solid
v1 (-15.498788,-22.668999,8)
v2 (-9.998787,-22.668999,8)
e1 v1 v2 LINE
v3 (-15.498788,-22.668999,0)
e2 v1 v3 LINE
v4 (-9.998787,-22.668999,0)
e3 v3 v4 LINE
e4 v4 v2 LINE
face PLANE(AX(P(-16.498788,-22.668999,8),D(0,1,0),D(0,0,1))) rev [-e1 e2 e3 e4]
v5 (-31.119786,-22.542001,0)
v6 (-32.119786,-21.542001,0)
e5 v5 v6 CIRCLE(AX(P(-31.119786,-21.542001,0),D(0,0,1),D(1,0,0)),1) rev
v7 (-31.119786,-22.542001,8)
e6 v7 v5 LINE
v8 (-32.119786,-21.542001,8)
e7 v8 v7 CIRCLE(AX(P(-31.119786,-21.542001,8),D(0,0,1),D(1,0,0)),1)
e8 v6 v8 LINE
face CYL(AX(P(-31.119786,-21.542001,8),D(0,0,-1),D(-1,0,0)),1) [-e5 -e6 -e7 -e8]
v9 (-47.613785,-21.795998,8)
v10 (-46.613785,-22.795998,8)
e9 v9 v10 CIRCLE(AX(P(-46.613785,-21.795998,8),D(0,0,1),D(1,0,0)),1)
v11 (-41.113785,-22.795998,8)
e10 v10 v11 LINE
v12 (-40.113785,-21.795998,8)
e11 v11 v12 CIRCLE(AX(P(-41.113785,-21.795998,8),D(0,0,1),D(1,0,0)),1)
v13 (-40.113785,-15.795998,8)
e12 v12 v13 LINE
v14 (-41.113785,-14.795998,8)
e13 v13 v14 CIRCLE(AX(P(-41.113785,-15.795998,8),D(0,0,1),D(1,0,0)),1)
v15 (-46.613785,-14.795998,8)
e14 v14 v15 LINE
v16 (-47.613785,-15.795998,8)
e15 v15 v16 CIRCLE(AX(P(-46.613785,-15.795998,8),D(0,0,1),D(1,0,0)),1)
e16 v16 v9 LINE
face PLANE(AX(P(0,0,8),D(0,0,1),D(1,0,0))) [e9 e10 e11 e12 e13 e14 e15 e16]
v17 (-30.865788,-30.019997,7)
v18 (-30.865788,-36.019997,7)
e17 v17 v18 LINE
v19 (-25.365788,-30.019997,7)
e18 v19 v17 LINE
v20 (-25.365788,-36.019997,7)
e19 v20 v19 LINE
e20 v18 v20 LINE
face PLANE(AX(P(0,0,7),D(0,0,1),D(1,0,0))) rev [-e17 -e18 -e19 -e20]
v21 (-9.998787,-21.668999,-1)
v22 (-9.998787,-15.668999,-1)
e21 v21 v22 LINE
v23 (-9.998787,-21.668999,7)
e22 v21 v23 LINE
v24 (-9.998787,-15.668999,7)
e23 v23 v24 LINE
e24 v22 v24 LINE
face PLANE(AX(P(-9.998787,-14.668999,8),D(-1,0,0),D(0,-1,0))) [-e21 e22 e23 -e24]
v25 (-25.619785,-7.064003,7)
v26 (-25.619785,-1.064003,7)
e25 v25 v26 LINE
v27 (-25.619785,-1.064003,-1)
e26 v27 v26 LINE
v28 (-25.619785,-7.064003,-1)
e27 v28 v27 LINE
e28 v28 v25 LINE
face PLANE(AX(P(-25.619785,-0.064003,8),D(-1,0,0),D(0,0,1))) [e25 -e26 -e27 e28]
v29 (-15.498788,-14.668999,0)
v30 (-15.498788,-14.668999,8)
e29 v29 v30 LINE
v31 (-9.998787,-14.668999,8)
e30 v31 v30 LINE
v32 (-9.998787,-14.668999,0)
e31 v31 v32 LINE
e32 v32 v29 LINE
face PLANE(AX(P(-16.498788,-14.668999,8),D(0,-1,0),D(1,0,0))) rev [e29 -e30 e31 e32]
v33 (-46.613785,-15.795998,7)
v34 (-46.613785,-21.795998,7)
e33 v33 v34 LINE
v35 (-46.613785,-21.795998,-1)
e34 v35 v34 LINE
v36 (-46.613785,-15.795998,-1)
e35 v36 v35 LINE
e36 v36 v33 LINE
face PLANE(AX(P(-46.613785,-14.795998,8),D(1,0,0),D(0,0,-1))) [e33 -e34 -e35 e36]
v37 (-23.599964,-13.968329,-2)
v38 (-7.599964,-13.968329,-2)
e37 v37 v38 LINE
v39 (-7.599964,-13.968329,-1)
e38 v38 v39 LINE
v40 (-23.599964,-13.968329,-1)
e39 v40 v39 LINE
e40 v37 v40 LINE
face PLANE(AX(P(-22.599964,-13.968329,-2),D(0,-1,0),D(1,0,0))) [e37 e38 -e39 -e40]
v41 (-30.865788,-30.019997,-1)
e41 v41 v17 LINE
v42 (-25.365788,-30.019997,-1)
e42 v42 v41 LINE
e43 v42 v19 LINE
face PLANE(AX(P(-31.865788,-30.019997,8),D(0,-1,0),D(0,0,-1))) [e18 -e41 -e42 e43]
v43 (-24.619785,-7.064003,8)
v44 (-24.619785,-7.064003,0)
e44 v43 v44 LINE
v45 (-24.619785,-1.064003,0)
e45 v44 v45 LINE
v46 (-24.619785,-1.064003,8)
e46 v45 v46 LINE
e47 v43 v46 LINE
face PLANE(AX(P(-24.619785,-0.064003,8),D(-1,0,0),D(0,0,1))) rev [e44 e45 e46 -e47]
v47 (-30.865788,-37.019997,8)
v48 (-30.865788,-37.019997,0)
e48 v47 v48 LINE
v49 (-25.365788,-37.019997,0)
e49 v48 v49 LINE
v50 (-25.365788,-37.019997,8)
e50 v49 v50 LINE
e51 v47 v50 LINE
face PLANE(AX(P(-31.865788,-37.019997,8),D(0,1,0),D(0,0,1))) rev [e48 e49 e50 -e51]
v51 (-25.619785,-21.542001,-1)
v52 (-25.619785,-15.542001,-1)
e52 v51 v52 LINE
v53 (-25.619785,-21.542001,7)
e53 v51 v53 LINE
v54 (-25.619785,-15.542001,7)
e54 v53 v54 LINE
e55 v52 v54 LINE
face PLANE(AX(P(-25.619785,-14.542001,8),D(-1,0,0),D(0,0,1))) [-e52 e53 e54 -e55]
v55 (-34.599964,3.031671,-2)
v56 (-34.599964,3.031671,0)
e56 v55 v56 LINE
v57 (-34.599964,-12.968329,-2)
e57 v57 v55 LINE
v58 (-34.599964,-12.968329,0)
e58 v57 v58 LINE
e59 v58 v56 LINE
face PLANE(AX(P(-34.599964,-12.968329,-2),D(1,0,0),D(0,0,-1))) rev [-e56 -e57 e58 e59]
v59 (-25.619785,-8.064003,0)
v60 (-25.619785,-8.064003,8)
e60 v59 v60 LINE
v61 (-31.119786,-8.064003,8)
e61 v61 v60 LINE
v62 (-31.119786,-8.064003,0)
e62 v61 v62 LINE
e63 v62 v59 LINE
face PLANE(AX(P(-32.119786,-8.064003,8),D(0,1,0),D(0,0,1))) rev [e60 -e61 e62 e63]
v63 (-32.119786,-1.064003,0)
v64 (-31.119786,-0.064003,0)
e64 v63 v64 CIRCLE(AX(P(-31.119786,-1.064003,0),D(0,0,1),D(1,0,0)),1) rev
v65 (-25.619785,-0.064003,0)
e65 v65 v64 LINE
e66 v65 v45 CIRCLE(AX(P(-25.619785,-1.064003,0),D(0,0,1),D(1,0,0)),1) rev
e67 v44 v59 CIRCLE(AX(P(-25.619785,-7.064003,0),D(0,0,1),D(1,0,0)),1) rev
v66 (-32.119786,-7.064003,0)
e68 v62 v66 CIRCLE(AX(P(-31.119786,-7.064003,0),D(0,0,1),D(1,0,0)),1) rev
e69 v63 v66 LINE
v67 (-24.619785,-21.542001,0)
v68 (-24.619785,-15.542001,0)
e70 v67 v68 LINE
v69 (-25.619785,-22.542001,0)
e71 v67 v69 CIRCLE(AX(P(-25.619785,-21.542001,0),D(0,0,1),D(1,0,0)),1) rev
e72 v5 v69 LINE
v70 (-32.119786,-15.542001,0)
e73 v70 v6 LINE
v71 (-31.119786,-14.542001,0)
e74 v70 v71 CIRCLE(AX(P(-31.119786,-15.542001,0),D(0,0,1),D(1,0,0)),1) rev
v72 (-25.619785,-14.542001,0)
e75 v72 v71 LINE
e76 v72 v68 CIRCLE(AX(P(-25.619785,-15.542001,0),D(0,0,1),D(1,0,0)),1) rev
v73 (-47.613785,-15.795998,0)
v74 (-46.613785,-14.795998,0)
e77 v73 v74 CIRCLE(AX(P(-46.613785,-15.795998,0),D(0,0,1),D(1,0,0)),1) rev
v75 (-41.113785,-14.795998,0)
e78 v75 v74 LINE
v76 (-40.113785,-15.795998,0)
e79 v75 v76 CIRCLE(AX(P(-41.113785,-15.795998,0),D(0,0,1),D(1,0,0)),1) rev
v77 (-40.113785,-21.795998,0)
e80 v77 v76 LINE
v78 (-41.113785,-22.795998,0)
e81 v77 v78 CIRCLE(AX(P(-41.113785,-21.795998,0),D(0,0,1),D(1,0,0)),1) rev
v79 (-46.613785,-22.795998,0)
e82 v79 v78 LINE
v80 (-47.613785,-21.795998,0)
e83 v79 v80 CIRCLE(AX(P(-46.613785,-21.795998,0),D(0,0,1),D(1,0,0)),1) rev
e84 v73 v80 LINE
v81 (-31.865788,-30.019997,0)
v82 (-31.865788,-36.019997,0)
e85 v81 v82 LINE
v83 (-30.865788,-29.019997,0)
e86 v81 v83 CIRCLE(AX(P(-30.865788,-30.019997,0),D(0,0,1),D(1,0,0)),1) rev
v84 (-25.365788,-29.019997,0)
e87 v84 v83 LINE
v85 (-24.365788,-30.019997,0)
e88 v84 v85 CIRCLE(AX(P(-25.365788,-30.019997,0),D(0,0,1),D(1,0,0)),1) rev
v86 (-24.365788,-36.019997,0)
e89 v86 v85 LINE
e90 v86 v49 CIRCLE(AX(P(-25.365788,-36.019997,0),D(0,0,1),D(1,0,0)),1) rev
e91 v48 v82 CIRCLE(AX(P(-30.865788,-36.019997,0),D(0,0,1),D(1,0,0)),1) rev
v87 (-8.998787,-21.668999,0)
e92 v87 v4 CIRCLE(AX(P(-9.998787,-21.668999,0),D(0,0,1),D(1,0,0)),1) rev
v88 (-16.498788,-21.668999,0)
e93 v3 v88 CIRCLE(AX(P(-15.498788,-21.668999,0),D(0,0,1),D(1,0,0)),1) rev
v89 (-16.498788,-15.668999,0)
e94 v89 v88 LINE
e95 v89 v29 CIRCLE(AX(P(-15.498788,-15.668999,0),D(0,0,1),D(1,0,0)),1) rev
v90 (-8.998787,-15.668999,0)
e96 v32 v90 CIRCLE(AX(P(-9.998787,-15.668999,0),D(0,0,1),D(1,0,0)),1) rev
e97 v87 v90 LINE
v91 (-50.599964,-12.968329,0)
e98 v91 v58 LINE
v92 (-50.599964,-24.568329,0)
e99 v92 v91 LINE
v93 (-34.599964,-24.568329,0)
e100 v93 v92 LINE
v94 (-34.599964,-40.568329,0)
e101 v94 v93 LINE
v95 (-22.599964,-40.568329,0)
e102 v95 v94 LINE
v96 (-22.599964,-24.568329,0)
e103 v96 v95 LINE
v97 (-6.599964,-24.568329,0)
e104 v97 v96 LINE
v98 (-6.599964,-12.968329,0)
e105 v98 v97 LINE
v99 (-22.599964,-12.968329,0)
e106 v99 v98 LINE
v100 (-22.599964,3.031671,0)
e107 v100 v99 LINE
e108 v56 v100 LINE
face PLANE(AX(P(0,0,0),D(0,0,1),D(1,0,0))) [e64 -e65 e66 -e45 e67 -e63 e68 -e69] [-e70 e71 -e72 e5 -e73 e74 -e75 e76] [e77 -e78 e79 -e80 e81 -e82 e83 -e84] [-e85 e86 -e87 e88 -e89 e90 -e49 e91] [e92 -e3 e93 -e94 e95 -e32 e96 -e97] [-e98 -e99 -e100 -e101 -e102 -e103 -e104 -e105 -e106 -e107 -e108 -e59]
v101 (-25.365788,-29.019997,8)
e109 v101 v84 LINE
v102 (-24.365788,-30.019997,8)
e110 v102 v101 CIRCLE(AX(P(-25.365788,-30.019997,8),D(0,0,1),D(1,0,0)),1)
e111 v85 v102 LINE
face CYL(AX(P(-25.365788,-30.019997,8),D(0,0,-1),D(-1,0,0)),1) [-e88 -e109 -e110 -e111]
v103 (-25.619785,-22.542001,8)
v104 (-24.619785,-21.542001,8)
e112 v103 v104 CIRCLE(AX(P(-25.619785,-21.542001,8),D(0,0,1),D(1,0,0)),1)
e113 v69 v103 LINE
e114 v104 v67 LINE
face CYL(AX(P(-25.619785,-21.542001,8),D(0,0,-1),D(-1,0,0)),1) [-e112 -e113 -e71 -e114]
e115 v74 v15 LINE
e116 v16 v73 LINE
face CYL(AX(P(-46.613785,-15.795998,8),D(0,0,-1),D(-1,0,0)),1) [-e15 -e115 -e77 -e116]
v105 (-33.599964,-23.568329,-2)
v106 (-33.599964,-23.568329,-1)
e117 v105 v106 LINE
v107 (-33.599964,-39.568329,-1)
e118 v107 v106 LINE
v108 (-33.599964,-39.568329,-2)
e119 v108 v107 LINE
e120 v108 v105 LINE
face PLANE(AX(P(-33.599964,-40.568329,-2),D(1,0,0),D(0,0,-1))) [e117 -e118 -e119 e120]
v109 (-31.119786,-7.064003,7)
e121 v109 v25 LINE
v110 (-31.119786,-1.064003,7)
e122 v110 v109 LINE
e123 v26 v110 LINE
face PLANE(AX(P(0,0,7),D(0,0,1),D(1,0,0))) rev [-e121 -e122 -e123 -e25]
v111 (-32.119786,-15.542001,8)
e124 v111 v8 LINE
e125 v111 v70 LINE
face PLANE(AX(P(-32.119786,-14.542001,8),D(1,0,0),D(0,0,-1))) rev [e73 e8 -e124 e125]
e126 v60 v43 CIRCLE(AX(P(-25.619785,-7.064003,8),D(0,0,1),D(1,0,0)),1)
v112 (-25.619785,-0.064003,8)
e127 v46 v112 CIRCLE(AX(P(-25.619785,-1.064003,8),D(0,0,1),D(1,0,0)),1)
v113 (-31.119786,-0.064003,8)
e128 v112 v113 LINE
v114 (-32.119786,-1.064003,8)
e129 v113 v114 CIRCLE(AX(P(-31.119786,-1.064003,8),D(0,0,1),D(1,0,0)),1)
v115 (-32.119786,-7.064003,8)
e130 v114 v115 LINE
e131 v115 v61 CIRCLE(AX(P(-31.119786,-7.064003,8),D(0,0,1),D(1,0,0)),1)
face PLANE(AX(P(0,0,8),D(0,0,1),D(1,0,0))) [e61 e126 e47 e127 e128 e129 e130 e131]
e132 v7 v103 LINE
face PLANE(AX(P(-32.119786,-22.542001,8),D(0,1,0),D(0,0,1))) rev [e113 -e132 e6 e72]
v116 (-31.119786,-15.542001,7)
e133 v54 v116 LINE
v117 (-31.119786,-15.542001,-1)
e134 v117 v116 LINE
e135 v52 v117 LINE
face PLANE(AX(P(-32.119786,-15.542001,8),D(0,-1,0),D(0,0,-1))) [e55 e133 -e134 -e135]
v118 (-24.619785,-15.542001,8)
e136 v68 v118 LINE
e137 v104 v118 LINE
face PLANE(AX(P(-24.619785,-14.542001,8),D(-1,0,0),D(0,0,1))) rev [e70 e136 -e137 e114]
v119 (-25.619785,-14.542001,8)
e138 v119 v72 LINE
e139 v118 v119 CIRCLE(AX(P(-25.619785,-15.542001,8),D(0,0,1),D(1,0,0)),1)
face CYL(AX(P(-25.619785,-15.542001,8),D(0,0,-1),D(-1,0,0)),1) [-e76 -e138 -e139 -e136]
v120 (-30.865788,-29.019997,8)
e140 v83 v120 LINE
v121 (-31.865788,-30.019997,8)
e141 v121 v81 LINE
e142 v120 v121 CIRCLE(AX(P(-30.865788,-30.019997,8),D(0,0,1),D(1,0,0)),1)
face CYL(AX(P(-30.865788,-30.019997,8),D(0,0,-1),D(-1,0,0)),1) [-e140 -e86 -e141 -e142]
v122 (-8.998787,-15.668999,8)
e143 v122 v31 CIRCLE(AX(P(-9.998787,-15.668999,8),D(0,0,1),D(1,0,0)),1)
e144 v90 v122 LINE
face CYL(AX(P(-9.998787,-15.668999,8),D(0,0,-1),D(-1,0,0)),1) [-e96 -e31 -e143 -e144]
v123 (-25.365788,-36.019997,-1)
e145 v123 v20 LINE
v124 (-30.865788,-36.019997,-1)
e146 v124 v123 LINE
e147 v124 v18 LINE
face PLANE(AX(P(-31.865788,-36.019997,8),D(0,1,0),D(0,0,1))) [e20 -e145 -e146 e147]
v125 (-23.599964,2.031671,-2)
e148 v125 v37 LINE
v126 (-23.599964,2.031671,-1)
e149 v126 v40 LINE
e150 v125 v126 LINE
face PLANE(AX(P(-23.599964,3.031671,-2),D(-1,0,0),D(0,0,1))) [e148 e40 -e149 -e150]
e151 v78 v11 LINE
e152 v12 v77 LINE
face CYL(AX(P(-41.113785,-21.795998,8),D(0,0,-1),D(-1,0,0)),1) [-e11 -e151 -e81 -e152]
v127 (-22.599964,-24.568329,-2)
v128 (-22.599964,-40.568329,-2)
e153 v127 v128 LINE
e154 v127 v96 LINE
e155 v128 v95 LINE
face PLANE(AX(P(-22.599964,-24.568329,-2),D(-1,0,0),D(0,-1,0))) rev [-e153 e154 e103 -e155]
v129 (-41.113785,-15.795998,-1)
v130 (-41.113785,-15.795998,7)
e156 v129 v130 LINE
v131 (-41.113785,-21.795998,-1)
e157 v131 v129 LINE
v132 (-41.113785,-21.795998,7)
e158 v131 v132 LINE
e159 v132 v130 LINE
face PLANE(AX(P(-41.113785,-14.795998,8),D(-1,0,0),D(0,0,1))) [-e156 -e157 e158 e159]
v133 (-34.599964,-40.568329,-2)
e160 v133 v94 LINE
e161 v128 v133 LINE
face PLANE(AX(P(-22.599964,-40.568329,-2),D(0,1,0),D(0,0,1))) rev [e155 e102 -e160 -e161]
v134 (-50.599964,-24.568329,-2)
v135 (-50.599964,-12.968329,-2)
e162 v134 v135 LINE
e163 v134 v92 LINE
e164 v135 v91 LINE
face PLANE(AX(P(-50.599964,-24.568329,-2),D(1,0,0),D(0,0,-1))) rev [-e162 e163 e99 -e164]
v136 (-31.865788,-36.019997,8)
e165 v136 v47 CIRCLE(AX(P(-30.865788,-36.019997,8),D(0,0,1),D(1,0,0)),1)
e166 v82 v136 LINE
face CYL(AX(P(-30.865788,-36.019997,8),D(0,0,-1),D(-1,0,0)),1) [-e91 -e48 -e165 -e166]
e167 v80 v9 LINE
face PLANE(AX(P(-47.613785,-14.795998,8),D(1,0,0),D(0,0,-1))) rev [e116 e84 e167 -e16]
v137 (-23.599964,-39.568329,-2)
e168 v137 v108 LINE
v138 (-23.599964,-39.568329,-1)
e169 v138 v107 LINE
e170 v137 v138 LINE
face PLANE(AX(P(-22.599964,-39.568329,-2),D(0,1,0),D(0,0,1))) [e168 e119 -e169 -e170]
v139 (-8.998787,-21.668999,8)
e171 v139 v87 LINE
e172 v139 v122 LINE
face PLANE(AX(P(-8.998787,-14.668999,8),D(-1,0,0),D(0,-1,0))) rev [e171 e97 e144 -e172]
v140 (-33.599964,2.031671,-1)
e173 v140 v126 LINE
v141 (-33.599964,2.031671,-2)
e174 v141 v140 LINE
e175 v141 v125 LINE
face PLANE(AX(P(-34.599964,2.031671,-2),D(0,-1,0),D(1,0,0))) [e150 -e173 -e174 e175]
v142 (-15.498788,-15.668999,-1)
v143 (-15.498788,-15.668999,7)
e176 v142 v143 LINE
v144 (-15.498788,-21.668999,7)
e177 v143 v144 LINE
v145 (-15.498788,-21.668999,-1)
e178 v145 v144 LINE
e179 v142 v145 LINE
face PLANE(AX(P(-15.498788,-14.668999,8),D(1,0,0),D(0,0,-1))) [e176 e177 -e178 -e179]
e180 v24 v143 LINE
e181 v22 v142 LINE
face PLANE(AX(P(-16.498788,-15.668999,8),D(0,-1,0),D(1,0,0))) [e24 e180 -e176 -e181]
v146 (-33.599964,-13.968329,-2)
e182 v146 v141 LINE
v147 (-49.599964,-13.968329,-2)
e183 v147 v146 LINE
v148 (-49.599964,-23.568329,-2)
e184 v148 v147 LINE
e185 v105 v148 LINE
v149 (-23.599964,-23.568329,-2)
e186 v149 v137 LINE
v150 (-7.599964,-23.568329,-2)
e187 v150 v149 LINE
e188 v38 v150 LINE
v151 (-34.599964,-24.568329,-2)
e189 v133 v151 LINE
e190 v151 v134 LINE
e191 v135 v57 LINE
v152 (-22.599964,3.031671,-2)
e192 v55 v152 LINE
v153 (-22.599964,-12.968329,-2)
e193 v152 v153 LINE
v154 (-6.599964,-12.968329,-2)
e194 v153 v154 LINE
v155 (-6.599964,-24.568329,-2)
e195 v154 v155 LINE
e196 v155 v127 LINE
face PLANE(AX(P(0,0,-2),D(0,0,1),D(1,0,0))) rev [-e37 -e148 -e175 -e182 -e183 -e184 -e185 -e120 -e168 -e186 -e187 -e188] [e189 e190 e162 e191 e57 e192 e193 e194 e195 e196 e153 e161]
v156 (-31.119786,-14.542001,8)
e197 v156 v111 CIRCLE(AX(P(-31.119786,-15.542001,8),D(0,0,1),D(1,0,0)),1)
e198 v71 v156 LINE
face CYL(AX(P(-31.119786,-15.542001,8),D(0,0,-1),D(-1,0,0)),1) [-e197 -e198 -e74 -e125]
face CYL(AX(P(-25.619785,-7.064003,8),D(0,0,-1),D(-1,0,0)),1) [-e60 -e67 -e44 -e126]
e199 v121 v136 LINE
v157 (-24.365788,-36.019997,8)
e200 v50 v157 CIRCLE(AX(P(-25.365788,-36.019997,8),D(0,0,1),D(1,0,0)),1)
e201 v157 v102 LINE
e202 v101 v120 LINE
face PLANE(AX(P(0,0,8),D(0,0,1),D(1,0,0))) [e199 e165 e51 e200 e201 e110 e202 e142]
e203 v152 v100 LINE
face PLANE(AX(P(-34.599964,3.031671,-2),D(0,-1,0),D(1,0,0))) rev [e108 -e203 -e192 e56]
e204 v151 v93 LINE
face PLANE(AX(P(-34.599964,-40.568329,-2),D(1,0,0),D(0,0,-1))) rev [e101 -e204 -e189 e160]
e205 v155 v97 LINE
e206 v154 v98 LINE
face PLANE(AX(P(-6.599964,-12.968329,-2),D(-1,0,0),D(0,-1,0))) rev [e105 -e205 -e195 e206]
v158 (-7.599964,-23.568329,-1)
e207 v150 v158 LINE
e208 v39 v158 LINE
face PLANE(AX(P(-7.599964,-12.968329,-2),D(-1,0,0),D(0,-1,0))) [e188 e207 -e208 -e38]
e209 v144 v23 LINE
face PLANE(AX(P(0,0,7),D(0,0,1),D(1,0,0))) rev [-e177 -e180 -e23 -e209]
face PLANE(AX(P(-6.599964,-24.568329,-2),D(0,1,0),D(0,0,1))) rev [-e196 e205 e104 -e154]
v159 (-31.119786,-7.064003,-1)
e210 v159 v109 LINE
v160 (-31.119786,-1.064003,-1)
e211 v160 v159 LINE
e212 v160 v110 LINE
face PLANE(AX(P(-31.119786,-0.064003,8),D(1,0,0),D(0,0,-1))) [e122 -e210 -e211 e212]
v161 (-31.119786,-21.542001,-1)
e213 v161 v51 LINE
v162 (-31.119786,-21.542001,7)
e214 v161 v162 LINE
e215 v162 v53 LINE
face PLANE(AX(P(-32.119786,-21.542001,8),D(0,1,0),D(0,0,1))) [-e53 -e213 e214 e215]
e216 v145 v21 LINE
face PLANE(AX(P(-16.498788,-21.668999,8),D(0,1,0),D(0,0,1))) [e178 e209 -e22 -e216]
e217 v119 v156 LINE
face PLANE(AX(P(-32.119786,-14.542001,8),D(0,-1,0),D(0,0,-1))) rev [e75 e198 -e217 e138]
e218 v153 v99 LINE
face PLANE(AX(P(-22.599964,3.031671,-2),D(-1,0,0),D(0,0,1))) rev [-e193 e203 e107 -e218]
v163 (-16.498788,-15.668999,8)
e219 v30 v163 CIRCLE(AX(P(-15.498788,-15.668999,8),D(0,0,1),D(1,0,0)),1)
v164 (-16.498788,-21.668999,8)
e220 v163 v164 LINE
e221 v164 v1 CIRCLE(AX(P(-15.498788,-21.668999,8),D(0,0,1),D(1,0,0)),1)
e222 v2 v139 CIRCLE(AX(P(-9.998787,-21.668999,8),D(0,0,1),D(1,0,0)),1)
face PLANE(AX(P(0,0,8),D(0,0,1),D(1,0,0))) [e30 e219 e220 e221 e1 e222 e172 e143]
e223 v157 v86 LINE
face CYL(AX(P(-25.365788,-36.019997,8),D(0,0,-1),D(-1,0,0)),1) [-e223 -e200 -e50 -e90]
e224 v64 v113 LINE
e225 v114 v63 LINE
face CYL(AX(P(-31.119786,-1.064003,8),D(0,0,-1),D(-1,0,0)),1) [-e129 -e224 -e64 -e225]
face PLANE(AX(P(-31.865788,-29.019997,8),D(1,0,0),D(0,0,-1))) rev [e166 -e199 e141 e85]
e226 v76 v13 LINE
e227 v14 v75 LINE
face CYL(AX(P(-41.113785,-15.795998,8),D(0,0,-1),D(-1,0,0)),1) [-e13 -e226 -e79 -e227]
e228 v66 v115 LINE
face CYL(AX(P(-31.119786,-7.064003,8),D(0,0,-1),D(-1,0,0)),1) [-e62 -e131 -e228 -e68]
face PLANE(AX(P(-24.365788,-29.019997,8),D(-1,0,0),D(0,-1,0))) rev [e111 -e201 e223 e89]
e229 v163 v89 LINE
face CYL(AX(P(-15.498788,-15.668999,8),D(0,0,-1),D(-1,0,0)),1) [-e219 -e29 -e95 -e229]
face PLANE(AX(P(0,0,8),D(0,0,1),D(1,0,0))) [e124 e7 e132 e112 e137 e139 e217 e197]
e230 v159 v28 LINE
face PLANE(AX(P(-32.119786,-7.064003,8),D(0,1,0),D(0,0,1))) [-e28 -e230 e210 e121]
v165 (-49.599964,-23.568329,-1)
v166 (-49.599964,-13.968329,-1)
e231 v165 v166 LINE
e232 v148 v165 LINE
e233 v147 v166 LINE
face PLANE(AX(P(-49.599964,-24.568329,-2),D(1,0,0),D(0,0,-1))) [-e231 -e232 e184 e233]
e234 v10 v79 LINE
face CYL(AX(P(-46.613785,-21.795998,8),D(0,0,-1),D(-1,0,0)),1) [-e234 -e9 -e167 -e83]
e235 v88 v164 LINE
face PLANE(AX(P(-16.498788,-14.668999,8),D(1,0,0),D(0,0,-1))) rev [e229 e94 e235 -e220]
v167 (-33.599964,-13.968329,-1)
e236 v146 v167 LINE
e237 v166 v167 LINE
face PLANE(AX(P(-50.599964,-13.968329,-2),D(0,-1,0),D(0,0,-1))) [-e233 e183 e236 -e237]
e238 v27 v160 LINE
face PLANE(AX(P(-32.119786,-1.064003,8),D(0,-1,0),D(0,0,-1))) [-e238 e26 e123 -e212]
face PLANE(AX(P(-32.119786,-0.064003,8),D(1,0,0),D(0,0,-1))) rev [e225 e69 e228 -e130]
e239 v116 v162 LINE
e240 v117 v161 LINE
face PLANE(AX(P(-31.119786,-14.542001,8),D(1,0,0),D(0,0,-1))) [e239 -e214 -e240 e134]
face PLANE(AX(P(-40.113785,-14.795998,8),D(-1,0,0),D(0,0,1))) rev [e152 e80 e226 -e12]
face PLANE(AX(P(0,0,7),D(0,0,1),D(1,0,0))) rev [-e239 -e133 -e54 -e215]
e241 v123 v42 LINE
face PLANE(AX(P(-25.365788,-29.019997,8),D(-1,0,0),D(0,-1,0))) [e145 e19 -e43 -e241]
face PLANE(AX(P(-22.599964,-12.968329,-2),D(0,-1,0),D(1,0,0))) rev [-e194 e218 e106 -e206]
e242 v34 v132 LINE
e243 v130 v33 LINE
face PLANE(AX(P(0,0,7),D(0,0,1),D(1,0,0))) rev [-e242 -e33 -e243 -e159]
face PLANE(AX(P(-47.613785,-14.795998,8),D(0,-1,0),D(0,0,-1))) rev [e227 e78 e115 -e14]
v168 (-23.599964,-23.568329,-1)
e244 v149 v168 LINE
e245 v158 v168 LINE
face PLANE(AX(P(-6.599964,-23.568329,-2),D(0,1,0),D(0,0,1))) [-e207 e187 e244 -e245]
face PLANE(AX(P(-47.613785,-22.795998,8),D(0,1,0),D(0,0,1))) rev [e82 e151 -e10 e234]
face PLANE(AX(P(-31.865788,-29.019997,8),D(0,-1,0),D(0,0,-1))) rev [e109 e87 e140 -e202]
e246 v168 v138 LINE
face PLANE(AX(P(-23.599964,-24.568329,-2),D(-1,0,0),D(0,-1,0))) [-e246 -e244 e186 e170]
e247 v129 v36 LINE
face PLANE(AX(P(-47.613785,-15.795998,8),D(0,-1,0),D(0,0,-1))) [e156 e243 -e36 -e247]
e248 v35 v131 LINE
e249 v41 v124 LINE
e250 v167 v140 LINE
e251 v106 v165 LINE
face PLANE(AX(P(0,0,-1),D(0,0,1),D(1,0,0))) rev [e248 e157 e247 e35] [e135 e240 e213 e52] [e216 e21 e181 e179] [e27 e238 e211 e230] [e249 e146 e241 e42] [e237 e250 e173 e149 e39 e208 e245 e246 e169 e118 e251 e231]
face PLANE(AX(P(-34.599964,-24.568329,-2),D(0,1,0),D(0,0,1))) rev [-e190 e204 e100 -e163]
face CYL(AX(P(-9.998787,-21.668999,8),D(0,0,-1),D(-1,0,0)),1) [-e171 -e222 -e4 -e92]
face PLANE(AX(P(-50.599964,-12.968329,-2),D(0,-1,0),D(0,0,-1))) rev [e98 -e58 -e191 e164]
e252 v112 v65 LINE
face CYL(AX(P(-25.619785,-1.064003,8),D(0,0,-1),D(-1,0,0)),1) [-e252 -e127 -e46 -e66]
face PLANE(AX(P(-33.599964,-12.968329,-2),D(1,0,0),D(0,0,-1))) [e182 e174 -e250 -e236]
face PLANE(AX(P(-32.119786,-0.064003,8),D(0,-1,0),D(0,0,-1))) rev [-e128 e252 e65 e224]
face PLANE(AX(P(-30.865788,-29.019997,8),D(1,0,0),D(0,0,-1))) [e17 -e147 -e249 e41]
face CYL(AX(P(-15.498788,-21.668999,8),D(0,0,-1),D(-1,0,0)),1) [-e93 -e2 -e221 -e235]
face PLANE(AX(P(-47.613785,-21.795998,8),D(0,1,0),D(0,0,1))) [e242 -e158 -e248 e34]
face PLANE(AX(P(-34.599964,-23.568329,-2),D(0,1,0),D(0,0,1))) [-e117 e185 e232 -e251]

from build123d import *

# Parameters (mm, degrees)
SKETCH1_W             = 7.5000007
SKETCH1_H             = 8
BOSS_EXTRUDE1_DEPTH   = 8
BOSS_EXTRUDE1_2_DEPTH = 8
SKETCH1_W_2           = 7.500000349
SKETCH1_H_2           = 7.999999673
BOSS_EXTRUDE1_3_DEPTH = 8
SKETCH1_W_3           = 7.500000699
SKETCH1_H_3           = 7.999999344
BOSS_EXTRUDE1_4_DEPTH = 8
SKETCH1_W_4           = 7.50000035
SKETCH1_H_4           = 7.999999672
BOSS_EXTRUDE1_5_DEPTH = 8
BOSS_EXTRUDE2_DEPTH   = 2
FILLET1_R             = 1
FILLET2_R             = 1
FILLET3_R             = 1
FILLET4_R             = 1
FILLET5_R             = 1
SHELL8_START          = -2
SHELL8_OUTLINE_W      = 5.5000007
SHELL8_OUTLINE_H      = 6
SHELL8_OUTLINE_W_2    = 5.500000349
SHELL8_OUTLINE_H_2    = 5.999999673
SHELL8_OUTLINE_W_3    = 5.500000699
SHELL8_OUTLINE_H_3    = 5.999999344
SHELL8_OUTLINE_W_4    = 5.50000035
SHELL8_OUTLINE_H_4    = 5.999999672
SHELL8_DEPTH          = 9
SHELL8_2_OUTLINE_W    = 5.50000035
SHELL8_2_OUTLINE_H    = 5.999999672
SHELL8_2_OUTLINE_W_2  = 5.500000699
SHELL8_2_OUTLINE_H_2  = 5.999999344
SHELL8_2_OUTLINE_W_3  = 5.5000007
SHELL8_2_OUTLINE_H_3  = 6
SHELL8_2_OUTLINE_W_4  = 5.500000349
SHELL8_2_OUTLINE_H_4  = 5.999999673
SHELL8_2_DEPTH        = 1


# Read off the part's stored shape, not the designer's step: Shell8
with BuildPart() as part:
    # Sketch1 → Boss-Extrude1 (new body)
    with BuildSketch(Plane.XY):
        with Locations((-28.369785759, -4.064003029)):
            Rectangle(SKETCH1_W, SKETCH1_H)
    extrude(amount=BOSS_EXTRUDE1_DEPTH)



with BuildPart() as body_2:
    # Sketch1 → Boss-Extrude1 2 (new body)
    with BuildSketch(Plane.XY):
        with Locations((-28.369785759, -18.542000511)):
            Rectangle(SKETCH1_W, SKETCH1_H)
    extrude(amount=BOSS_EXTRUDE1_2_DEPTH)


with BuildPart() as body_3:
    # Sketch1 → Boss-Extrude1 3 (new body)
    with BuildSketch(Plane.XY):
        with Locations((-12.748787377, -18.668999085)):
            Rectangle(SKETCH1_W_2, SKETCH1_H_2)
    extrude(amount=BOSS_EXTRUDE1_3_DEPTH)


with BuildPart() as body_4:
    # Sketch1 → Boss-Extrude1 4 (new body)
    with BuildSketch(Plane.XY):
        with Locations((-28.115787957, -33.019997009)):
            Rectangle(SKETCH1_W_3, SKETCH1_H_3)
    extrude(amount=BOSS_EXTRUDE1_4_DEPTH)


with BuildPart() as body_5:
    # Sketch1 → Boss-Extrude1 5 (new body)
    with BuildSketch(Plane.XY):
        with Locations((-43.86378524, -18.795997986)):
            Rectangle(SKETCH1_W_4, SKETCH1_H_4)
    extrude(amount=BOSS_EXTRUDE1_5_DEPTH)


with BuildPart() as part_1:
    add(part.part)

    add(body_2.part)  # Boss-Extrude2 merges body 2

    add(body_3.part)  # Boss-Extrude2 merges body 3

    add(body_4.part)  # Boss-Extrude2 merges body 4

    add(body_5.part)  # Boss-Extrude2 merges body 5
    # Sketch3 → Boss-Extrude2 (add)
    with BuildSketch(Plane(origin=(0, 0, 0), x_dir=(-1, 0, 0), z_dir=(0, 0, -1))):
        Polygon((22.599963615, -12.968328574), (6.599963615, -12.968328574), (6.599963615, -24.568328574), (22.599963615, -24.568328574), (22.599963615, -40.568328574), (34.599963615, -40.568328574), (34.599963615, -24.568328574), (50.599963615, -24.568328574), (50.599963615, -12.968328574), (34.599963615, -12.968328574), (34.599963615, 3.031671426), (22.599963615, 3.031671426), align=None)
    extrude(amount=BOSS_EXTRUDE2_DEPTH)

    # Fillet1
    fillet1_edges = [part_1.edges().sort_by_distance(p)[0] for p in [
        (-31.865788306, -29.019997337, 4),
        (-31.865788306, -37.019996681, 4),
        (-24.365787607, -37.019996681, 4),
        (-24.365787607, -29.019997337, 4),
    ]]
    fillet(fillet1_edges, radius=FILLET1_R)

    # Fillet2
    fillet2_edges = [part_1.edges().sort_by_distance(p)[0] for p in [
        (-32.119786109, -14.542000511, 4),
        (-32.119786109, -22.542000511, 4),
        (-24.619785409, -22.542000511, 4),
        (-24.619785409, -14.542000511, 4),
    ]]
    fillet(fillet2_edges, radius=FILLET2_R)

    # Fillet3
    fillet3_edges = [part_1.edges().sort_by_distance(p)[0] for p in [
        (-47.613785415, -14.79599815, 4),
        (-47.613785415, -22.795997822, 4),
        (-40.113785065, -22.795997822, 4),
        (-40.113785065, -14.79599815, 4),
    ]]
    fillet(fillet3_edges, radius=FILLET3_R)

    # Fillet4
    fillet4_edges = [part_1.edges().sort_by_distance(p)[0] for p in [
        (-32.119786109, -0.064003029, 4),
        (-24.619785409, -0.064003029, 4),
        (-24.619785409, -8.064003029, 4),
        (-32.119786109, -8.064003029, 4),
    ]]
    fillet(fillet4_edges, radius=FILLET4_R)

    # Fillet5
    fillet5_edges = [part_1.edges().sort_by_distance(p)[0] for p in [
        (-16.498787551, -14.668999248, 4),
        (-16.498787551, -22.668998921, 4),
        (-8.998787202, -22.668998921, 4),
        (-8.998787202, -14.668999248, 4),
    ]]
    fillet(fillet5_edges, radius=FILLET5_R)

    # Shell8 outline → Shell8 (cut)
    with BuildSketch(Plane.XY.offset(SHELL8_START)):
        with Locations((-28.369785759, -4.064003029)):
            Rectangle(SHELL8_OUTLINE_W, SHELL8_OUTLINE_H)
        with Locations((-28.369785759, -18.542000511)):
            Rectangle(SHELL8_OUTLINE_W, SHELL8_OUTLINE_H)
        with Locations((-12.748787377, -18.668999085)):
            Rectangle(SHELL8_OUTLINE_W_2, SHELL8_OUTLINE_H_2)
        with Locations((-28.115787957, -33.019997009)):
            Rectangle(SHELL8_OUTLINE_W_3, SHELL8_OUTLINE_H_3)
        with Locations((-43.86378524, -18.795997986)):
            Rectangle(SHELL8_OUTLINE_W_4, SHELL8_OUTLINE_H_4)
    extrude(amount=SHELL8_DEPTH, mode=Mode.SUBTRACT)

    # Shell8 2 outline → Shell8 2 (cut)
    with BuildSketch(Plane.XY.offset(SHELL8_START)):
        Polygon((-23.599963615, -13.968328574), (-23.599963615, 2.031671426), (-33.599963615, 2.031671426), (-33.599963615, -13.968328574), (-49.599963615, -13.968328574), (-49.599963615, -23.568328574), (-33.599963615, -23.568328574), (-33.599963615, -39.568328574), (-23.599963615, -39.568328574), (-23.599963615, -23.568328574), (-7.599963615, -23.568328574), (-7.599963615, -13.968328574), align=None)
        with Locations((-43.86378524, -18.795997986)):
            Rectangle(SHELL8_2_OUTLINE_W, SHELL8_2_OUTLINE_H, mode=Mode.SUBTRACT)
        with Locations((-28.115787957, -33.019997009)):
            Rectangle(SHELL8_2_OUTLINE_W_2, SHELL8_2_OUTLINE_H_2, mode=Mode.SUBTRACT)
        with Locations((-28.369785759, -18.542000511)):
            Rectangle(SHELL8_2_OUTLINE_W_3, SHELL8_2_OUTLINE_H_3, mode=Mode.SUBTRACT)
        with Locations((-12.748787377, -18.668999085)):
            Rectangle(SHELL8_2_OUTLINE_W_4, SHELL8_2_OUTLINE_H_4, mode=Mode.SUBTRACT)
        with Locations((-28.369785759, -4.064003029)):
            Rectangle(SHELL8_2_OUTLINE_W_3, SHELL8_2_OUTLINE_H_3, mode=Mode.SUBTRACT)
    extrude(amount=SHELL8_2_DEPTH, mode=Mode.SUBTRACT)


solid = part_1.part
